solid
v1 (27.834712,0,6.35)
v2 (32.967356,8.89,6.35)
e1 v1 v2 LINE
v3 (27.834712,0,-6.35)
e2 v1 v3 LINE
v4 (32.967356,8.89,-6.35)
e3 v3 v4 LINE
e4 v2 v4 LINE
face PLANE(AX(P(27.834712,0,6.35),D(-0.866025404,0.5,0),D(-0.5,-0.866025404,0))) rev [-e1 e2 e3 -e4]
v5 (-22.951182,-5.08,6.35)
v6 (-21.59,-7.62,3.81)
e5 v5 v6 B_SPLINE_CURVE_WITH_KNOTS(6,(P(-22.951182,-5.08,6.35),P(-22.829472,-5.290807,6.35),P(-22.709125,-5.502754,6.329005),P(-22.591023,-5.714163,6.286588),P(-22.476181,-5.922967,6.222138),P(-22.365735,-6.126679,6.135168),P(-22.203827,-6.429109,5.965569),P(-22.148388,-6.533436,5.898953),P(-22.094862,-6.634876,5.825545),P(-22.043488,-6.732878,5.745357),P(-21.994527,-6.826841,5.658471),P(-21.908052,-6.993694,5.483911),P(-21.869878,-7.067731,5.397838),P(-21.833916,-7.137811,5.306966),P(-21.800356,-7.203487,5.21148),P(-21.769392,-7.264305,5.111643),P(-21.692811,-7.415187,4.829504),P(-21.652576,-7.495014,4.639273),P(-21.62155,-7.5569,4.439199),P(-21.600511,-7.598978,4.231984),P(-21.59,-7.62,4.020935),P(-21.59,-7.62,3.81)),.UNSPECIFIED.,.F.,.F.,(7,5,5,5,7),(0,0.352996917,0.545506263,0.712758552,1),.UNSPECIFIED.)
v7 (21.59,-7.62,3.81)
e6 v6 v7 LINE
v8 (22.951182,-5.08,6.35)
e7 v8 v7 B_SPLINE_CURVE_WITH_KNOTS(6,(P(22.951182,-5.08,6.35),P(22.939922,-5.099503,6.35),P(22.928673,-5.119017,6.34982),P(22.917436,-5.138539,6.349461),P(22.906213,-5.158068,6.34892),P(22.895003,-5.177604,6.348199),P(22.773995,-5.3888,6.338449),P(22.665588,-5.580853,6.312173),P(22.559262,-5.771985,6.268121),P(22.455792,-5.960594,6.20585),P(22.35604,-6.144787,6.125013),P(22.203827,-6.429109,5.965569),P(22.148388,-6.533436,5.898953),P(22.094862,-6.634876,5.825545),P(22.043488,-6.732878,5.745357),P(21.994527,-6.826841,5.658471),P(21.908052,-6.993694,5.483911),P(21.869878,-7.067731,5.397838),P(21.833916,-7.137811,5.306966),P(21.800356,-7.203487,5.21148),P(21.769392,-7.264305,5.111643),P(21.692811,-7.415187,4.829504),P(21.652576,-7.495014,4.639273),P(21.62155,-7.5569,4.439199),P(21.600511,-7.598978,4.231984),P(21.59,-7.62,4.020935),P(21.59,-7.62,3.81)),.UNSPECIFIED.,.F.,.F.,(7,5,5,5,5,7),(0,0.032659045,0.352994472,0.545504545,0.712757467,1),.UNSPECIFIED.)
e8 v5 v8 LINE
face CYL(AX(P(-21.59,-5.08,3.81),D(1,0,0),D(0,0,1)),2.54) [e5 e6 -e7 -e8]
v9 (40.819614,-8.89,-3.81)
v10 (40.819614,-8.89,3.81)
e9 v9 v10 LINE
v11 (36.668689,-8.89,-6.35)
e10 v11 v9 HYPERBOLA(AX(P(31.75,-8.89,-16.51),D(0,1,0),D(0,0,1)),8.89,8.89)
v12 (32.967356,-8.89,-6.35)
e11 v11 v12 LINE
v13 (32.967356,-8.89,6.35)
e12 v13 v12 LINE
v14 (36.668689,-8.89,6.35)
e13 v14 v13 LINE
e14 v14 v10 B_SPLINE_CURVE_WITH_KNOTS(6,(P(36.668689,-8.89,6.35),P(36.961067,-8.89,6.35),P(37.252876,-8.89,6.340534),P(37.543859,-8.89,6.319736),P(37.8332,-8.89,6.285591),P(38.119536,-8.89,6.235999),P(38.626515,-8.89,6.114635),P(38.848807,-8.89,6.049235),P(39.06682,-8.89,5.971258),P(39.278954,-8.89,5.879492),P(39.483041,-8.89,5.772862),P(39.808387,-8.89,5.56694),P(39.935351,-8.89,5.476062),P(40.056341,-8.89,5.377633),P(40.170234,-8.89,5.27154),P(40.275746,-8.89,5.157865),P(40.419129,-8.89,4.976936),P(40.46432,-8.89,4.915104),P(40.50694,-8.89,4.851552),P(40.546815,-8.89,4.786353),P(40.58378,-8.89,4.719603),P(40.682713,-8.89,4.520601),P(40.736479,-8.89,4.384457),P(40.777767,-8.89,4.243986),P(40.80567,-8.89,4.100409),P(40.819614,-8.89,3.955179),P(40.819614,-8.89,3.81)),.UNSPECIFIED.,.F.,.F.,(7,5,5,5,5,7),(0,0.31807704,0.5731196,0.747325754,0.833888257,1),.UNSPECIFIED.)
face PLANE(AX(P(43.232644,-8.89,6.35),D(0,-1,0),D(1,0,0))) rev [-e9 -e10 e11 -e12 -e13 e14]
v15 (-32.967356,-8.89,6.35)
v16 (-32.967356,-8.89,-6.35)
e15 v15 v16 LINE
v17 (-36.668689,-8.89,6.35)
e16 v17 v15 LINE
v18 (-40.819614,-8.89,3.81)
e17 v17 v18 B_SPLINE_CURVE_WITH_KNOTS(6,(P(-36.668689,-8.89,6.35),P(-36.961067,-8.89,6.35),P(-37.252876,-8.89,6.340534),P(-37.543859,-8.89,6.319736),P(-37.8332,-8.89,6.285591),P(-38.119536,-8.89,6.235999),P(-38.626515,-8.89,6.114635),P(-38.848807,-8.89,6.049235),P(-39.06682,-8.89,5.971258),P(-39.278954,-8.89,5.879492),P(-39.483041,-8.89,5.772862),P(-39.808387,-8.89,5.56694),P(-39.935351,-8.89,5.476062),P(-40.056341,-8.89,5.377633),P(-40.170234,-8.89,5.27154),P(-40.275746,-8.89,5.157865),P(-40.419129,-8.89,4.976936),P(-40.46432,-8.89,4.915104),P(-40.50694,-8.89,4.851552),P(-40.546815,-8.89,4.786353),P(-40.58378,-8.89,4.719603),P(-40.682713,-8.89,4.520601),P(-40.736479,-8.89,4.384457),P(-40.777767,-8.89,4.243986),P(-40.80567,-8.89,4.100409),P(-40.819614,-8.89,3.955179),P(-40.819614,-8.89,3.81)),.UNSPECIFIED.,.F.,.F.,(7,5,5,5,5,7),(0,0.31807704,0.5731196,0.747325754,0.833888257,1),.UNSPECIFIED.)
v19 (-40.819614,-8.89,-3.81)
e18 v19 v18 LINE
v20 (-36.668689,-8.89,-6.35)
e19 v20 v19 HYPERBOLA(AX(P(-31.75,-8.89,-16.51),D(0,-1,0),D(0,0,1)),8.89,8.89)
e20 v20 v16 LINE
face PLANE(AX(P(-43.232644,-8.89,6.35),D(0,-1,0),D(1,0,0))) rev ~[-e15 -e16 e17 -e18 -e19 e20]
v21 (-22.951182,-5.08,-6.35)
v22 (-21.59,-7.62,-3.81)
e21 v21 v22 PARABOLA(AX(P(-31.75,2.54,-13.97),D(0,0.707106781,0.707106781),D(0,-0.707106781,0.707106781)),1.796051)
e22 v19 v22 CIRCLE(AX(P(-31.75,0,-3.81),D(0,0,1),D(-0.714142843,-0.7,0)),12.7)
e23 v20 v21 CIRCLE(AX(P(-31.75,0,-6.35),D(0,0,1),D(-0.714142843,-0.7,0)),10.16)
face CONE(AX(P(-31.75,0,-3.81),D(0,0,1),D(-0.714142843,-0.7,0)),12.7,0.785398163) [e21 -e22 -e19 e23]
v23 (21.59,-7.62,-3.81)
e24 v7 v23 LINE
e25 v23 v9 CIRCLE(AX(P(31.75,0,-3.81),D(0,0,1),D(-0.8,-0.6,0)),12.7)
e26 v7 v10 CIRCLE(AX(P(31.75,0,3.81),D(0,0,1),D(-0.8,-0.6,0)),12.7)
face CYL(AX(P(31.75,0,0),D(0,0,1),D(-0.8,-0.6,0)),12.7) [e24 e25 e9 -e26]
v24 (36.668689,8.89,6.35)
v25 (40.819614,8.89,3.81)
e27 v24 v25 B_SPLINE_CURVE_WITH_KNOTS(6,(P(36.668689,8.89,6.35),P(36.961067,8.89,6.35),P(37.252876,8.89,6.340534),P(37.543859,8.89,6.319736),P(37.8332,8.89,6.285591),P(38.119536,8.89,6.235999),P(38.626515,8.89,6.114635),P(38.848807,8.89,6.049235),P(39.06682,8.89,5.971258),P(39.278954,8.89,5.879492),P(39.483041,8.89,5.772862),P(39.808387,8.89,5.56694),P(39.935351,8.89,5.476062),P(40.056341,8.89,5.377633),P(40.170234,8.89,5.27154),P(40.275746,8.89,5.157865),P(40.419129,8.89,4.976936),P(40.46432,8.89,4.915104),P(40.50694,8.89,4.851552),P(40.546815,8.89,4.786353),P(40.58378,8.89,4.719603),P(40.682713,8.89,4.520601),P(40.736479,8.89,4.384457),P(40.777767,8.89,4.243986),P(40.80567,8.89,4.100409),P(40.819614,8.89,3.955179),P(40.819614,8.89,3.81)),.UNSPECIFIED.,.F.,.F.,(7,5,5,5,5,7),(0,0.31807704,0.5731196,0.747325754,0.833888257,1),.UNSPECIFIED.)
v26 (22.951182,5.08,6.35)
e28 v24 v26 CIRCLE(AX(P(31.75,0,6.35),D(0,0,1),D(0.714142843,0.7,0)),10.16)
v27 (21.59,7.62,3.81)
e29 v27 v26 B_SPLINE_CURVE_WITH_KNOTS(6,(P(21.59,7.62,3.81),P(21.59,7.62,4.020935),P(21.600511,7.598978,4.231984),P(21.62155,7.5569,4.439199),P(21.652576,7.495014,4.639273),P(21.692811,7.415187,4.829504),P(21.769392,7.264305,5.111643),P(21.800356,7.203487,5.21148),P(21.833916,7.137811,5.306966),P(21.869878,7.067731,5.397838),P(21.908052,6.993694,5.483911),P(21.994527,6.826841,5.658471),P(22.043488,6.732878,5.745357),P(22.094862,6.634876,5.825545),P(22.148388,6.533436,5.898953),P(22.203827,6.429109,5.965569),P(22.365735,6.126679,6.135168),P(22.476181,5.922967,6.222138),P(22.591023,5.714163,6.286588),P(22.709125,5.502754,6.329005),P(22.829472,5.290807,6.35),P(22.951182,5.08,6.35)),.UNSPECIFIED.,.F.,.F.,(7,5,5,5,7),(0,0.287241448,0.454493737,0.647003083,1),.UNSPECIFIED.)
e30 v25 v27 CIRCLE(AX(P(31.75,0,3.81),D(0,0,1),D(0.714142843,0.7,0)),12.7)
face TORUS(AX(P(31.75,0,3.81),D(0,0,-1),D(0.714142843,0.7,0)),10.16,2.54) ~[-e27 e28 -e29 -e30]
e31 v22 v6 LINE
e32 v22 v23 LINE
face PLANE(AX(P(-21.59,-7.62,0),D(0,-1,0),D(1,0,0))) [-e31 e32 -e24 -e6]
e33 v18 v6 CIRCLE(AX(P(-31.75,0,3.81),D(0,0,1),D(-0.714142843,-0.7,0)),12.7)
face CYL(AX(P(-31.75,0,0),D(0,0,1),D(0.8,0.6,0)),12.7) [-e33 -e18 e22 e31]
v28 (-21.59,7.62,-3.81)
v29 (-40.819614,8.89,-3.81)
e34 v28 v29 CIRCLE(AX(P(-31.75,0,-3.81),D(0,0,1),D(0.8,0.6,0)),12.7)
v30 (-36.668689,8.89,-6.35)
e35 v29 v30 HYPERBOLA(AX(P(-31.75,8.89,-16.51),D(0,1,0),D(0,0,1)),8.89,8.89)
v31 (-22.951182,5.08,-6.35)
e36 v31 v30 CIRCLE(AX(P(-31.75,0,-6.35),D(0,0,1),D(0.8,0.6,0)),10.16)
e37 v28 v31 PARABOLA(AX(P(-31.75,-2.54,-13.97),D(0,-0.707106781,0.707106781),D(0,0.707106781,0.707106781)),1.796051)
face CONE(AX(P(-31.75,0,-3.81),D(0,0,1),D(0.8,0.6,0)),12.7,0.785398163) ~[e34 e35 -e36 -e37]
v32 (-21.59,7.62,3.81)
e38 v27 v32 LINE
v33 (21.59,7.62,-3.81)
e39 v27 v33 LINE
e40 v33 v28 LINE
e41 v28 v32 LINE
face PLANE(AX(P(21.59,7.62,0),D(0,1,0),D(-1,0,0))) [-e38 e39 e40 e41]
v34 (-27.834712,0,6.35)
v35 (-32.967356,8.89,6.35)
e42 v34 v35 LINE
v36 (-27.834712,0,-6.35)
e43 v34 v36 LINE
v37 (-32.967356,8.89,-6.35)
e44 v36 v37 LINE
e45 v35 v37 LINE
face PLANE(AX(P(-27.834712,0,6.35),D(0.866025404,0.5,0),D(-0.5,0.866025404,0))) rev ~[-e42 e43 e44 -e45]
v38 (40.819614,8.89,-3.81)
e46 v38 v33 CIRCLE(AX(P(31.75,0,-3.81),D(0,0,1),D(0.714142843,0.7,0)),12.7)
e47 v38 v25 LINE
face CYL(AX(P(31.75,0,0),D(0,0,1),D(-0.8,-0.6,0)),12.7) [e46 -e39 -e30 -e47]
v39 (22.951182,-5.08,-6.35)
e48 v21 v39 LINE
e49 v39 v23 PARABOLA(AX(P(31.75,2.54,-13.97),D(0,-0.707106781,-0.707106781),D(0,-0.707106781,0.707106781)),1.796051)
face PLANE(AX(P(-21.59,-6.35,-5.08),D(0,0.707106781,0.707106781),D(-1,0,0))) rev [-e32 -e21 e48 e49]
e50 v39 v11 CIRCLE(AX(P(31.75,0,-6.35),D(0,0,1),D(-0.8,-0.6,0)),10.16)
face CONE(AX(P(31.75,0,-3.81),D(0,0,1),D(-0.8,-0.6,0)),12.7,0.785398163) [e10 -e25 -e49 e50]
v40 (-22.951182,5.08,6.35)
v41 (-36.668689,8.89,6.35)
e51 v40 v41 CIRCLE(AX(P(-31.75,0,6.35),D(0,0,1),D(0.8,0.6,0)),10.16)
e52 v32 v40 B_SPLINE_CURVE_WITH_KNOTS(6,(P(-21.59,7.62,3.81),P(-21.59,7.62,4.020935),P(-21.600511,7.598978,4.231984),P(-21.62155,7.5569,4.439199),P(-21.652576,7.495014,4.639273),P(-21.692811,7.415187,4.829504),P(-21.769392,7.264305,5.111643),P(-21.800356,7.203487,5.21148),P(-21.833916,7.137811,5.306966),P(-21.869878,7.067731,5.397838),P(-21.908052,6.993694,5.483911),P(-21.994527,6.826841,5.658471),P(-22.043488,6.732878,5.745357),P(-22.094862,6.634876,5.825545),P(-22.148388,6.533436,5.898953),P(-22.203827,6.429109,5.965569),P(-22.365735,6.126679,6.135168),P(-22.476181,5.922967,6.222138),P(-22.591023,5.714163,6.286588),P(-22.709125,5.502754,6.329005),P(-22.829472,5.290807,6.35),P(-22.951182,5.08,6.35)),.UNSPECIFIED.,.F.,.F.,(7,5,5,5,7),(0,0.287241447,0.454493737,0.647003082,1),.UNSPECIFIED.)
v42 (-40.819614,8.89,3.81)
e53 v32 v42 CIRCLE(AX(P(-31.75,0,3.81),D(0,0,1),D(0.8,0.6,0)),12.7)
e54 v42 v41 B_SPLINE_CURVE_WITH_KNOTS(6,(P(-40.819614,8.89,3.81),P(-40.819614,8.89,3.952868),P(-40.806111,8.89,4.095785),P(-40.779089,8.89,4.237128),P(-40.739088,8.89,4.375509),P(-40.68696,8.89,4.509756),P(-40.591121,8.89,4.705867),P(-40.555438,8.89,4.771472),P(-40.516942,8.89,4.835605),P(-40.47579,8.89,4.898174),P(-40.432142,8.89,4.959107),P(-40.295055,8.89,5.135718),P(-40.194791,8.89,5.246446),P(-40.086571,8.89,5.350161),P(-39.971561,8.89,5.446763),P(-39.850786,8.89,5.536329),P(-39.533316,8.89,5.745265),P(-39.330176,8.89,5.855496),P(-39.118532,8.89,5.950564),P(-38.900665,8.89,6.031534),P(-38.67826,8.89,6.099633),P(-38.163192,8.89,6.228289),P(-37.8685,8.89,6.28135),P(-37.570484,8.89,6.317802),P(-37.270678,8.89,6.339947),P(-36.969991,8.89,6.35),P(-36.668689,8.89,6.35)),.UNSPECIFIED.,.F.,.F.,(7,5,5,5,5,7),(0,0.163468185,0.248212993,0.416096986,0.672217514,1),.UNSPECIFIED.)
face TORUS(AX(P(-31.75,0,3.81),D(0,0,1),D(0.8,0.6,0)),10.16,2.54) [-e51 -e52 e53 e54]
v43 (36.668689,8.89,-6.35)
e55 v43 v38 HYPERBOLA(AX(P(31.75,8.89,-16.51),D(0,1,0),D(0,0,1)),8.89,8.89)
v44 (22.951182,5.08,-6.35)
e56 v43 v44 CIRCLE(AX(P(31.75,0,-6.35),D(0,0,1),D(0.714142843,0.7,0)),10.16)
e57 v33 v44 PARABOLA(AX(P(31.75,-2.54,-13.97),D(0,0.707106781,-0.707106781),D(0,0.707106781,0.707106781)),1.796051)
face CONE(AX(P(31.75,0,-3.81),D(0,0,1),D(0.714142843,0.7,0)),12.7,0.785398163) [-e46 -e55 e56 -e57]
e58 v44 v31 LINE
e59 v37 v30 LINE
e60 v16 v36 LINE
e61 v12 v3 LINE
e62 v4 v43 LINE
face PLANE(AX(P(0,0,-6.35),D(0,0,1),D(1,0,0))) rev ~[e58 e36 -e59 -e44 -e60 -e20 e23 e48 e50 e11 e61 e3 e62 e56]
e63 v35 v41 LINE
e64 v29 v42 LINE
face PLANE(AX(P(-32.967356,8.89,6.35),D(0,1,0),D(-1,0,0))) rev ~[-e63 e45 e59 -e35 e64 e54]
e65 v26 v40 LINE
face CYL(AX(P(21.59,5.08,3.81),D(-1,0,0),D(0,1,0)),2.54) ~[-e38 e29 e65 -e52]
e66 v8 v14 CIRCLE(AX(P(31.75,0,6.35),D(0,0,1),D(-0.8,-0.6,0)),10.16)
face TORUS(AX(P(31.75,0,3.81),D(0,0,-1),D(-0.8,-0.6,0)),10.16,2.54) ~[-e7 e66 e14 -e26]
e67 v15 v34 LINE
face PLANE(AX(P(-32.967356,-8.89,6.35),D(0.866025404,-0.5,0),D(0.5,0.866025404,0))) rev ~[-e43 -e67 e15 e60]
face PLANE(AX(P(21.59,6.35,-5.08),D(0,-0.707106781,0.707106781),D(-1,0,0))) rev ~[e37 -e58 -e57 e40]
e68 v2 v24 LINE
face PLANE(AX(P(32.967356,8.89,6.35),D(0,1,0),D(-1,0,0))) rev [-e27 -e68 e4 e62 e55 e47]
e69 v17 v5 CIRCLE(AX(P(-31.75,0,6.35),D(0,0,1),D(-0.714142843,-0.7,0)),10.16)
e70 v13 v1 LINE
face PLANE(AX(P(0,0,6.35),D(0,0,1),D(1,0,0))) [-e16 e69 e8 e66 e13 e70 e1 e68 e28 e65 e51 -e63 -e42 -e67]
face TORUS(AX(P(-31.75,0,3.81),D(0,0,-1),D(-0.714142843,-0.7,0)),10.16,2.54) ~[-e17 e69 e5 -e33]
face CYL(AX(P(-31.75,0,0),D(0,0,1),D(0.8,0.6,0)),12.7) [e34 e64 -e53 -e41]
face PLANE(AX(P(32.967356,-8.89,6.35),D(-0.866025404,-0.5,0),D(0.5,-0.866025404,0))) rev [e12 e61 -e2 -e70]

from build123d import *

# Parameters (mm, degrees)
F1_DEPTH = 6.35
F3_DEPTH = 12.701
F6_R     = 2.54
F7_SIZE  = 2.54


with BuildPart() as f1:
    # F0 (on Top) → F1 (new body, symmetric)
    with BuildSketch(Plane.XY):
        with BuildLine():
            Line((21.59, 7.62), (-21.59, 7.62))
            ThreePointArc((-21.59, 7.62), (-44.45, 0), (-21.59, -7.62))
            Line((-21.59, -7.62), (21.59, -7.62))
            ThreePointArc((21.59, -7.62), (44.45, 0), (21.59, 7.62))
        make_face()
    extrude(amount=F1_DEPTH, both=True)

    # F4: F3 across plane


with BuildPart() as f3:
    # F2 (on face) → F3 (new body, through all)
    with BuildSketch(Plane.XY.offset(6.35)):
        Polygon((-48.3652877862, 0), (-43.2326438931, -8.89), (-32.9673561069, -8.89), (-27.8347122138, 0), (-32.9673561069, 8.89), (-43.2326438931, 8.89), align=None)
    extrude(amount=-F3_DEPTH)


with BuildPart() as f1_1:
    add(f1.part)
    add(f3.part.mirror(Plane.YZ), mode=Mode.SUBTRACT)

    # F5: cut F3
    add(f3.part, mode=Mode.SUBTRACT)

    # F6
    f6_edges = [f1_1.edges().sort_by_distance(p)[0] for p in [
        (0, -7.62, 6.35),
        (-30.913065, -12.672393, 6.35),
        (-30.913065, 12.672393, 6.35),
        (0, 7.62, 6.35),
        (30.913065, 12.672393, 6.35),
        (30.913065, -12.672393, 6.35),
    ]]
    fillet(f6_edges, radius=F6_R)

    # F7
    f7_edges = [f1_1.edges().sort_by_distance(p)[0] for p in [
        (-30.913065, -12.672393, -6.35),
        (0, -7.62, -6.35),
        (30.913065, -12.672393, -6.35),
        (-30.913065, 12.672393, -6.35),
        (0, 7.62, -6.35),
        (30.913065, 12.672393, -6.35),
    ]]
    chamfer(f7_edges, length=F7_SIZE)


solid = f1_1.part
